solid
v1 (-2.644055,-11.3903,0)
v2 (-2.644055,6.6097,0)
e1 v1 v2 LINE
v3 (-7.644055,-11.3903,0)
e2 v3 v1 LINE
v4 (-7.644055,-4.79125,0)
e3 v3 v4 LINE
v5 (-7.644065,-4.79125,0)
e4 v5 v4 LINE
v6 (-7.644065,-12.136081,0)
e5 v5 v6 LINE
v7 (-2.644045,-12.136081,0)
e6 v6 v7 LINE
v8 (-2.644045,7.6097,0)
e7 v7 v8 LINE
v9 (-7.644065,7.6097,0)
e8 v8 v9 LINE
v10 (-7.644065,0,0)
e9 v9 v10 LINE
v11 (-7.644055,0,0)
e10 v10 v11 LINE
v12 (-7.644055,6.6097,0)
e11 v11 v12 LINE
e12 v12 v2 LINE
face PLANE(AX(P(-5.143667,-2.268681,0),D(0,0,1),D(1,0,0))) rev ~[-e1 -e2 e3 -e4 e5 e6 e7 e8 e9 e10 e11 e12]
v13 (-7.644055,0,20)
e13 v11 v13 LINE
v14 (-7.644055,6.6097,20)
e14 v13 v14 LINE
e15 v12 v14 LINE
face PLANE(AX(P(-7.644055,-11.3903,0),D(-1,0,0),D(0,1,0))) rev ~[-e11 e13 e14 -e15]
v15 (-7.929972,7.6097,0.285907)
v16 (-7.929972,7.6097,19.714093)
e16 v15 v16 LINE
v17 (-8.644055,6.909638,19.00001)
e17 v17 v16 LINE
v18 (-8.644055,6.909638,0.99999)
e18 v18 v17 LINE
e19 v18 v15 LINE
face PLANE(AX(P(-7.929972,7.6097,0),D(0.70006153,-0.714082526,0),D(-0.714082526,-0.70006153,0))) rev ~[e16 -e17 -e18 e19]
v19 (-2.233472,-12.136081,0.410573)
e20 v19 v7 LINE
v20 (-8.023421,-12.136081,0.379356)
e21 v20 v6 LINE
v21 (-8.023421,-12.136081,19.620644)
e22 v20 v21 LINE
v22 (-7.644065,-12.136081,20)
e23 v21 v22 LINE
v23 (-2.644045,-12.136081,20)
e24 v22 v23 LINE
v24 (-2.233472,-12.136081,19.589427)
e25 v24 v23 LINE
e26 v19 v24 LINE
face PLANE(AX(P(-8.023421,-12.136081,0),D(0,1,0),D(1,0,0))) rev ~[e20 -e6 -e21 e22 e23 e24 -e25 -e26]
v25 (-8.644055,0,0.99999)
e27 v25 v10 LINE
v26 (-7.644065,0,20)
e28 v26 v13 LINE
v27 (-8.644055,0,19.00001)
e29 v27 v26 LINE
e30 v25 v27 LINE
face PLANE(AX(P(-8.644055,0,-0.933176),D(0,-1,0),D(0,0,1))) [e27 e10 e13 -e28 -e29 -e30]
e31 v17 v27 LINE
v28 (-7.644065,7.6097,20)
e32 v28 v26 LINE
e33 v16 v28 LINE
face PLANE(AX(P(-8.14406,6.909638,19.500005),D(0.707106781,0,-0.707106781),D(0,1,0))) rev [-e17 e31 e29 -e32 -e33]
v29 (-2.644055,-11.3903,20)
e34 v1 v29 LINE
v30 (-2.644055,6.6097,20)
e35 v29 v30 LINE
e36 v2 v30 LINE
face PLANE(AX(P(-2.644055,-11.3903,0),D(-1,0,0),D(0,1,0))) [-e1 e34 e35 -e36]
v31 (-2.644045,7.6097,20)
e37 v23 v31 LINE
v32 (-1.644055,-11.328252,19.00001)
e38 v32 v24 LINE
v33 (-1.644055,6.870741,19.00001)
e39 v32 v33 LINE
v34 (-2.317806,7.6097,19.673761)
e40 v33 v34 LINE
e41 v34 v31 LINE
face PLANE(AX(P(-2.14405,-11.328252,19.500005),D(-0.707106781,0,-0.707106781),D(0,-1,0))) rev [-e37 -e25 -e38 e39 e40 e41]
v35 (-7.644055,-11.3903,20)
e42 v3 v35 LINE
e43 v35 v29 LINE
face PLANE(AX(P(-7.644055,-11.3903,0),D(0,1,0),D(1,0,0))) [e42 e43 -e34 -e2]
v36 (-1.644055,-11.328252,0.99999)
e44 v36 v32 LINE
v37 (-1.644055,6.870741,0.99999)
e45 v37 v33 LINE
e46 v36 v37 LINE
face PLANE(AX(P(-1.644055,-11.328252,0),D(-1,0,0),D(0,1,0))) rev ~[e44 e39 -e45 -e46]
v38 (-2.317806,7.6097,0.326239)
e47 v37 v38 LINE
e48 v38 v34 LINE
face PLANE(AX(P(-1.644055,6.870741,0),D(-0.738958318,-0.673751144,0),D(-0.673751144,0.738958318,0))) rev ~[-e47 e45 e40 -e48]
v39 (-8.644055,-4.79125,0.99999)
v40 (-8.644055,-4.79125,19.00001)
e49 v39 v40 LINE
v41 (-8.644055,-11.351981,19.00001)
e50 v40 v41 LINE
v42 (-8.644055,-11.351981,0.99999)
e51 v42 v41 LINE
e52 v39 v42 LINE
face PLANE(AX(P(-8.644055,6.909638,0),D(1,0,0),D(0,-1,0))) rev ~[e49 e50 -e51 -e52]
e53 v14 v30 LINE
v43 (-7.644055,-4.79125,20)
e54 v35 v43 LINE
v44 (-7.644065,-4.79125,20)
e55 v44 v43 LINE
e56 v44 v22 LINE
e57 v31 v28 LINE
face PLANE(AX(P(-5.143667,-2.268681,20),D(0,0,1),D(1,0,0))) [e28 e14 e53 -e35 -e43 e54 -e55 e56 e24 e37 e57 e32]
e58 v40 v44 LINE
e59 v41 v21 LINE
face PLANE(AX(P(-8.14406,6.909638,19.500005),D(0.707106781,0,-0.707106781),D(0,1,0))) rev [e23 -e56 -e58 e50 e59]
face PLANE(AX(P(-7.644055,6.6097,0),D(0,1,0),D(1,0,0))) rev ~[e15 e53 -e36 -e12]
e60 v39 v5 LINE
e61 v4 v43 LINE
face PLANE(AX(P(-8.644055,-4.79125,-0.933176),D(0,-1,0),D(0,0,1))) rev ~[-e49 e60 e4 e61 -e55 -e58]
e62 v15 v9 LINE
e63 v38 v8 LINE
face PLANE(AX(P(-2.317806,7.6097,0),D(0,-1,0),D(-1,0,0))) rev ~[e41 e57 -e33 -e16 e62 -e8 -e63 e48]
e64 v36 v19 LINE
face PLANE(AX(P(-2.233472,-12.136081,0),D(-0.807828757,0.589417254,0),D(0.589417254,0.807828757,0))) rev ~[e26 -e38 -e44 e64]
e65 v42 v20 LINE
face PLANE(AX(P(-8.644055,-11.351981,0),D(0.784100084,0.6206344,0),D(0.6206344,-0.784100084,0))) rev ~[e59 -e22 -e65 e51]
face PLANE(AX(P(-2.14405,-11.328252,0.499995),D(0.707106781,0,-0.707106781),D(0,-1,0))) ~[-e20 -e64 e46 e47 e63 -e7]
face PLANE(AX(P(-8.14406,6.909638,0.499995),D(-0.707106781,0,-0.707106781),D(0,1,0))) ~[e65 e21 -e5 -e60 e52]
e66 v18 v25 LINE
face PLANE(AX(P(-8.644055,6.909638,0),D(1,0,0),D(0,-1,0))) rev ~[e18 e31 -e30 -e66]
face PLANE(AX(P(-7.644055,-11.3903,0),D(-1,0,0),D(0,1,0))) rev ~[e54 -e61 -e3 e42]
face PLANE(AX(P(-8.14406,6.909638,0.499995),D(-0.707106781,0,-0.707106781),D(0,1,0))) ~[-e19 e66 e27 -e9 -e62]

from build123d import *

# Parameters (mm, degrees)
F0_W     = 5
F0_H     = 18
F1_DEPTH = 20
F2_SIZE  = 0.99999
F3_W     = 4.7912499867
F3_H     = 21.5901492629
F4_DEPTH = 5


# Not quite as in the source:
# - a fillet or chamfer is up to 0.001 mm smaller than in the source, because OpenCascade refuses the exact size


with BuildPart() as f1:
    # F0 (on Top) → F1 (new body)
    with BuildSketch(Plane.XY):
        Polygon((-2.3178061422, 7.6096997074), (-7.9299724714, 7.6096997074), (-8.6440549978, 6.9096381776), (-8.6440549978, -11.3519806733), (-8.0234205974, -12.1360807569), (-2.2334722516, -12.1360807569), (-1.6440549978, -11.3282519997), (-1.6440549978, 6.8707413895), align=None)
        with Locations((-5.1440549978, -2.3903002926)):
            Rectangle(F0_W, F0_H, mode=Mode.SUBTRACT)
    extrude(amount=F1_DEPTH)

    # F2 (size 1 in the source; OpenCascade refuses exactly that, so slightly less here)
    f2_edges = [f1.edges().sort_by_distance(p)[0] for p in [
        (-8.644055, -2.221171, 20),
        (-8.644055, -2.221171, 0),
        (-1.644055, -2.228755, 0),
        (-1.644055, -2.228755, 20),
    ]]
    chamfer(f2_edges, length=F2_SIZE)

    # F3 (on face) → F4 (cut)
    with BuildSketch(Plane(origin=(-8.6440549978, 0, 0), x_dir=(0, -1, 0), z_dir=(-1, 0, 0))):
        with Locations((2.3956249934, 9.8618984921)):
            Rectangle(F3_W, F3_H)
    extrude(amount=-F4_DEPTH, mode=Mode.SUBTRACT)


solid = f1.part
